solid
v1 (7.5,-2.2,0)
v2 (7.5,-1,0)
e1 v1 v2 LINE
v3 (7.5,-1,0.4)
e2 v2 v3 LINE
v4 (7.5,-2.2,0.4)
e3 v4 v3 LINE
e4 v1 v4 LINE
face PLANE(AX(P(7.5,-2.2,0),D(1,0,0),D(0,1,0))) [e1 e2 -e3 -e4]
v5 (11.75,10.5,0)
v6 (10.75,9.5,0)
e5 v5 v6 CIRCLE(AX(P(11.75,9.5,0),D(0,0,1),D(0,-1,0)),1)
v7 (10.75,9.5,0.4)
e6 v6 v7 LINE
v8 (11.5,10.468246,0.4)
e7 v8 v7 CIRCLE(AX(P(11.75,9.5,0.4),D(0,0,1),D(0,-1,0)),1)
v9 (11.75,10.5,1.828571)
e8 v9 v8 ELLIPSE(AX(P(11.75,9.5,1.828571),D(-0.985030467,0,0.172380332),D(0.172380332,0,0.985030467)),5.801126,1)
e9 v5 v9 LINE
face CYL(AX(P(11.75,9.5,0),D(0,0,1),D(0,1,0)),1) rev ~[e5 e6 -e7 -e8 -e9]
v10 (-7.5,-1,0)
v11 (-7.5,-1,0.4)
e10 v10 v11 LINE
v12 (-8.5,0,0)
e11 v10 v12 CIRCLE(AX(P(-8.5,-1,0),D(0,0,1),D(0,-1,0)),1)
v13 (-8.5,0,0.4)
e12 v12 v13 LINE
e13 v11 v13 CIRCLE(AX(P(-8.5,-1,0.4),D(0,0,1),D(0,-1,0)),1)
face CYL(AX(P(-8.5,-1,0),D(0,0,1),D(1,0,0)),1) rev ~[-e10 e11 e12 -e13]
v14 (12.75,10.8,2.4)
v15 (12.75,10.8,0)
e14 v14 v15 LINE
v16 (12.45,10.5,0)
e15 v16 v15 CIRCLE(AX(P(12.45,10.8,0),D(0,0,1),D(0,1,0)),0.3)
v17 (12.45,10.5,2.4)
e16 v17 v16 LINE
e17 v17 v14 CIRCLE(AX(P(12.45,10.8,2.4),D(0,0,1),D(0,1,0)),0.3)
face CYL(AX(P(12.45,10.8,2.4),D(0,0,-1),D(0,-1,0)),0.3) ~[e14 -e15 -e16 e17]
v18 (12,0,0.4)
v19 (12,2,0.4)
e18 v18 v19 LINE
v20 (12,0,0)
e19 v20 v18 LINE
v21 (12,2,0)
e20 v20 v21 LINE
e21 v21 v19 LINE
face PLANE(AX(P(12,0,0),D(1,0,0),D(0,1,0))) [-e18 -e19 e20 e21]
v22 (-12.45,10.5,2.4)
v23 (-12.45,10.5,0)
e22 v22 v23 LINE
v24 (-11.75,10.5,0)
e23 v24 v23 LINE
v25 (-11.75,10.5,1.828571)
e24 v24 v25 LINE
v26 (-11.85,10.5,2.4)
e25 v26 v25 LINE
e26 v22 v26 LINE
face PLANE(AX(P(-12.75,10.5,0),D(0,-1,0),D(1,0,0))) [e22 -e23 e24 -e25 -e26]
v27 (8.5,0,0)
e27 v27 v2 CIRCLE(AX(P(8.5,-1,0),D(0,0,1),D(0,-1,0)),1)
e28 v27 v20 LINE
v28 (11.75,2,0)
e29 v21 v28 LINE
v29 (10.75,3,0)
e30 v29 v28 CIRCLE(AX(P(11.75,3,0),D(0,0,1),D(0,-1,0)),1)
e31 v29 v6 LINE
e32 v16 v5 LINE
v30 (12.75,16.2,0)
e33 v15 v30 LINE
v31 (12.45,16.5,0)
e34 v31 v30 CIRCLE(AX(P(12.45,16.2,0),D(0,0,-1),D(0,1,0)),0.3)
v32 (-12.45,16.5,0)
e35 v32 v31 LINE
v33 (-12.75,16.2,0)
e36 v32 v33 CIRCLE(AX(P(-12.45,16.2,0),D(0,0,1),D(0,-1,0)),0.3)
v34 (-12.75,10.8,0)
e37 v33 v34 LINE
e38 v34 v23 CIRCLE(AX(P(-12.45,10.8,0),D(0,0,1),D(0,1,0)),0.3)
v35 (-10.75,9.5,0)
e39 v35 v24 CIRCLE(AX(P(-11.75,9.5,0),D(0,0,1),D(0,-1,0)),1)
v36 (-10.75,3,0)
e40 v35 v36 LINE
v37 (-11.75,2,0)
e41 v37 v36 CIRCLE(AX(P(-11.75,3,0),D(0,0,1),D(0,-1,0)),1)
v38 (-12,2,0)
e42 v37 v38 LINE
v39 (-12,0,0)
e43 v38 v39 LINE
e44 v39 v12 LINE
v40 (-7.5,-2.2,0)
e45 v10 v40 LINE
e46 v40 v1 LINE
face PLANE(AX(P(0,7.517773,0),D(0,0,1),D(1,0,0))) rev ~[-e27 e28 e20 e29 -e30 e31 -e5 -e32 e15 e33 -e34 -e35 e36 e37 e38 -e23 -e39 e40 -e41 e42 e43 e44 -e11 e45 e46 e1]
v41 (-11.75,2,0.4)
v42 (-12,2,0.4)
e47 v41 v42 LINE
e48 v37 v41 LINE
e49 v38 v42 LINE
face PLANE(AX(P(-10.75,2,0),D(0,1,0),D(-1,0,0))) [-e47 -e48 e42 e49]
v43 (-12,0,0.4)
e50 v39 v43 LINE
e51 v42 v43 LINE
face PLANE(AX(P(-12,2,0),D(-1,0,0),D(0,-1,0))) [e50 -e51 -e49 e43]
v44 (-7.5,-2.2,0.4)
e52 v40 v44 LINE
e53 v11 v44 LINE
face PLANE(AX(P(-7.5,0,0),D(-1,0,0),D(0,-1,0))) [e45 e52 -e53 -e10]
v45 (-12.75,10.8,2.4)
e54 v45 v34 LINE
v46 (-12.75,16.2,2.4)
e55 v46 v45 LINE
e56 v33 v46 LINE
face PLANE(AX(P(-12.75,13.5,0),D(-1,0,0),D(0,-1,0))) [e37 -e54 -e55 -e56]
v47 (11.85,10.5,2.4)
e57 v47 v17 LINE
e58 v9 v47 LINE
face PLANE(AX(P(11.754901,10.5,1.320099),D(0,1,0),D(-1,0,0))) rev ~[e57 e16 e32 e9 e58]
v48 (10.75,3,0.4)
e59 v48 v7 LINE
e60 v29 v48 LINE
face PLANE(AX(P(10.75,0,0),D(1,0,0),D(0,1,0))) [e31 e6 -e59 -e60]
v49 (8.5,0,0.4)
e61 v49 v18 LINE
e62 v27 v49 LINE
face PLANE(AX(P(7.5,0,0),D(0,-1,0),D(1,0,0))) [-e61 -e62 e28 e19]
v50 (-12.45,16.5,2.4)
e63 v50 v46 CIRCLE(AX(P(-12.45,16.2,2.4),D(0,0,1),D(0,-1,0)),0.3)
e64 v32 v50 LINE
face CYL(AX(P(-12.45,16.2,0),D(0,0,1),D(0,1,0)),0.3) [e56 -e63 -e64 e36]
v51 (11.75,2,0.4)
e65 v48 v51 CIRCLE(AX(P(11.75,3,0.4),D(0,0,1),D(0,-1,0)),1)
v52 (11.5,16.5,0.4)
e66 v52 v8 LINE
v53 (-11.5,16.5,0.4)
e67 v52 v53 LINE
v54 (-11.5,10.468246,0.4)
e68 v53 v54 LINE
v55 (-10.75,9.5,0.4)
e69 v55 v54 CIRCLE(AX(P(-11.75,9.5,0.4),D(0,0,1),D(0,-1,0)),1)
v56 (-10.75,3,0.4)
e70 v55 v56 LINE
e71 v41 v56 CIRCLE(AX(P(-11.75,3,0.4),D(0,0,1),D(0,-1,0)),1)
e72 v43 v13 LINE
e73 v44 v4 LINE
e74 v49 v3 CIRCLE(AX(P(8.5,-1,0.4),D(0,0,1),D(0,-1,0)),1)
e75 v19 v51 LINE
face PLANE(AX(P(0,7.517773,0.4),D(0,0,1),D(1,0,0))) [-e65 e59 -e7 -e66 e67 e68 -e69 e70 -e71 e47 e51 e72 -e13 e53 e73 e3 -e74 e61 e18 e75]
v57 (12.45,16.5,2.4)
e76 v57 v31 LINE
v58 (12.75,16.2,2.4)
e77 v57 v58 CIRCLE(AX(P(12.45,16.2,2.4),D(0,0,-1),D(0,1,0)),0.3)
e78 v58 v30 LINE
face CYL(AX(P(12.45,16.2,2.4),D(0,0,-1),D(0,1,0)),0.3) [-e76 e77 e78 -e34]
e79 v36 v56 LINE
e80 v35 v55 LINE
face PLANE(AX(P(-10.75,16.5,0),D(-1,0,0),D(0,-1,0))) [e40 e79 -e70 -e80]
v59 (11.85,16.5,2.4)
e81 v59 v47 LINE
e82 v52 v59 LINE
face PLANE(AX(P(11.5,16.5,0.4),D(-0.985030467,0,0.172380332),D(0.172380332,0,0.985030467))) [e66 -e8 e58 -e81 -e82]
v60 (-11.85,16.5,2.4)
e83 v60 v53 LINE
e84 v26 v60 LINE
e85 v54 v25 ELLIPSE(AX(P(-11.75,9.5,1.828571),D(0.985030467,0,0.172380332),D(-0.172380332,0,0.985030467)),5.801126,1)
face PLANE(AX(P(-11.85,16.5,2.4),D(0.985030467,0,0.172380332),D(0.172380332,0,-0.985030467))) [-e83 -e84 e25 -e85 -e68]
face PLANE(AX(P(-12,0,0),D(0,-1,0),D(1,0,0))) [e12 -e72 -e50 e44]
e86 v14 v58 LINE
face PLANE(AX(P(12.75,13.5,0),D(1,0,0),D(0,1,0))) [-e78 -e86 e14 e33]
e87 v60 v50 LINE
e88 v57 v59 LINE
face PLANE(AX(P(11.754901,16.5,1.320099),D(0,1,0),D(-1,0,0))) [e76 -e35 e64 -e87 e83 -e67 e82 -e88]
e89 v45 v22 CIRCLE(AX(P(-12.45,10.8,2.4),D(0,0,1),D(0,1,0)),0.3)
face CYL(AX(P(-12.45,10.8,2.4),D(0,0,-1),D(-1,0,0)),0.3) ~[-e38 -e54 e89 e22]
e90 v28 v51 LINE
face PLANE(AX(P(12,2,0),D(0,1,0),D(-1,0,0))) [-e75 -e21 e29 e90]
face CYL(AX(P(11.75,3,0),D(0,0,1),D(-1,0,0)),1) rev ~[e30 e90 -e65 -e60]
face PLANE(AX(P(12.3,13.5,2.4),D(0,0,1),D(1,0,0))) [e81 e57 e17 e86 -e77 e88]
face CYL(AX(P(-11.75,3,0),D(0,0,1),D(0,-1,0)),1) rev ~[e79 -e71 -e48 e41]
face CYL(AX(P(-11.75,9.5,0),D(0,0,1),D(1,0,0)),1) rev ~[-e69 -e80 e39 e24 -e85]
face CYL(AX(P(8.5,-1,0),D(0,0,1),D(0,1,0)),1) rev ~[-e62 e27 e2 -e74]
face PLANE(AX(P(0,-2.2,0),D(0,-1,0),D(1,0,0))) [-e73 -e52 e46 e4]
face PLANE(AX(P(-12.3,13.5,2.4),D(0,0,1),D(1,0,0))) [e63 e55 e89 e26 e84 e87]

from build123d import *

# Parameters (mm, degrees)
F0_W     = 15
F0_H     = 1
F0_H_2   = 1.2
F0_W_2   = 1.1
F0_H_3   = 6
F0_W_3   = 0.9
F5_DEPTH = 6
F6_R     = 1
F7_R     = 0.3


with BuildPart() as f2:
    # F2: sweep along a path in F1
    with BuildLine(Plane.XZ) as f2_path:
        Line((0, 0), (0, 0.4))
    # F0 (on Top) → F2 (sweep)
    with BuildSketch(Plane.XY):
        Polygon((-10.75, 1), (-10.75, 0), (-7.5, 0), (7.5, 0), (10.75, 0), (10.75, 1), align=None)
        Polygon((-12, 0), (-10.75, 0), (-10.75, 1), (-10.75, 2), (-12, 2), align=None)
        with Locations((0, -0.5)):
            Rectangle(F0_W, F0_H)
        Polygon((-10.75, 2), (-10.75, 1), (10.75, 1), (10.75, 2), (10.75, 10.5), (10.75, 16.5), (-10.75, 16.5), (-10.75, 10.5), align=None)
        with Locations((0, -1.6)):
            Rectangle(F0_W, F0_H_2)
        Polygon((10.75, 2), (10.75, 1), (10.75, 0), (12, 0), (12, 2), align=None)
        with Locations((-11.3, 13.5)):
            Rectangle(F0_W_2, F0_H_3)
        with Locations((-12.3, 13.5)):
            Rectangle(F0_W_3, F0_H_3)
        with Locations((11.3, 13.5)):
            Rectangle(F0_W_2, F0_H_3)
        with Locations((12.3, 13.5)):
            Rectangle(F0_W_3, F0_H_3)
    sweep(path=f2_path.line)

    # F3: sweep along a path in F1
    with BuildLine(Plane.XZ) as f3_path:
        Line((0, 0), (0, 0.4))
        Line((0, 0.4), (0, 2.4))
    # F0 (on Top) → F3 (sweep)
    with BuildSketch(Plane.XY):
        with Locations((12.3, 13.5)):
            Rectangle(F0_W_3, F0_H_3)
        with Locations((-12.3, 13.5)):
            Rectangle(F0_W_3, F0_H_3)
    sweep(path=f3_path.line)

    # F4 (on face) → F5 (join, through all)
    with BuildSketch(Plane(origin=(0, 16.5, 0), x_dir=(-1, 0, 0), z_dir=(0, 1, 0))):
        Polygon((-11.5, 0.4), (-11.85, 2.4), (-11.85, 0.4), align=None)
        Polygon((11.85, 2.4), (11.5, 0.4), (11.85, 0.4), align=None)
    extrude(amount=-F5_DEPTH)

    # F6
    f6_edges = [f2.edges().sort_by_distance(p)[0] for p in [
        (7.5, 0, 0.2),
        (-7.5, 0, 0.2),
        (-10.75, 2, 0.2),
        (-10.75, 10.5, 0.2),
        (10.75, 10.5, 0.2),
        (10.75, 2, 0.2),
    ]]
    fillet(f6_edges, radius=F6_R)

    # F7
    f7_edges = [f2.edges().sort_by_distance(p)[0] for p in [
        (-12.75, 16.5, 1.2),
        (12.75, 16.5, 1.2),
        (12.75, 10.5, 1.2),
        (-12.75, 10.5, 1.2),
    ]]
    fillet(f7_edges, radius=F7_R)


solid = f2.part
